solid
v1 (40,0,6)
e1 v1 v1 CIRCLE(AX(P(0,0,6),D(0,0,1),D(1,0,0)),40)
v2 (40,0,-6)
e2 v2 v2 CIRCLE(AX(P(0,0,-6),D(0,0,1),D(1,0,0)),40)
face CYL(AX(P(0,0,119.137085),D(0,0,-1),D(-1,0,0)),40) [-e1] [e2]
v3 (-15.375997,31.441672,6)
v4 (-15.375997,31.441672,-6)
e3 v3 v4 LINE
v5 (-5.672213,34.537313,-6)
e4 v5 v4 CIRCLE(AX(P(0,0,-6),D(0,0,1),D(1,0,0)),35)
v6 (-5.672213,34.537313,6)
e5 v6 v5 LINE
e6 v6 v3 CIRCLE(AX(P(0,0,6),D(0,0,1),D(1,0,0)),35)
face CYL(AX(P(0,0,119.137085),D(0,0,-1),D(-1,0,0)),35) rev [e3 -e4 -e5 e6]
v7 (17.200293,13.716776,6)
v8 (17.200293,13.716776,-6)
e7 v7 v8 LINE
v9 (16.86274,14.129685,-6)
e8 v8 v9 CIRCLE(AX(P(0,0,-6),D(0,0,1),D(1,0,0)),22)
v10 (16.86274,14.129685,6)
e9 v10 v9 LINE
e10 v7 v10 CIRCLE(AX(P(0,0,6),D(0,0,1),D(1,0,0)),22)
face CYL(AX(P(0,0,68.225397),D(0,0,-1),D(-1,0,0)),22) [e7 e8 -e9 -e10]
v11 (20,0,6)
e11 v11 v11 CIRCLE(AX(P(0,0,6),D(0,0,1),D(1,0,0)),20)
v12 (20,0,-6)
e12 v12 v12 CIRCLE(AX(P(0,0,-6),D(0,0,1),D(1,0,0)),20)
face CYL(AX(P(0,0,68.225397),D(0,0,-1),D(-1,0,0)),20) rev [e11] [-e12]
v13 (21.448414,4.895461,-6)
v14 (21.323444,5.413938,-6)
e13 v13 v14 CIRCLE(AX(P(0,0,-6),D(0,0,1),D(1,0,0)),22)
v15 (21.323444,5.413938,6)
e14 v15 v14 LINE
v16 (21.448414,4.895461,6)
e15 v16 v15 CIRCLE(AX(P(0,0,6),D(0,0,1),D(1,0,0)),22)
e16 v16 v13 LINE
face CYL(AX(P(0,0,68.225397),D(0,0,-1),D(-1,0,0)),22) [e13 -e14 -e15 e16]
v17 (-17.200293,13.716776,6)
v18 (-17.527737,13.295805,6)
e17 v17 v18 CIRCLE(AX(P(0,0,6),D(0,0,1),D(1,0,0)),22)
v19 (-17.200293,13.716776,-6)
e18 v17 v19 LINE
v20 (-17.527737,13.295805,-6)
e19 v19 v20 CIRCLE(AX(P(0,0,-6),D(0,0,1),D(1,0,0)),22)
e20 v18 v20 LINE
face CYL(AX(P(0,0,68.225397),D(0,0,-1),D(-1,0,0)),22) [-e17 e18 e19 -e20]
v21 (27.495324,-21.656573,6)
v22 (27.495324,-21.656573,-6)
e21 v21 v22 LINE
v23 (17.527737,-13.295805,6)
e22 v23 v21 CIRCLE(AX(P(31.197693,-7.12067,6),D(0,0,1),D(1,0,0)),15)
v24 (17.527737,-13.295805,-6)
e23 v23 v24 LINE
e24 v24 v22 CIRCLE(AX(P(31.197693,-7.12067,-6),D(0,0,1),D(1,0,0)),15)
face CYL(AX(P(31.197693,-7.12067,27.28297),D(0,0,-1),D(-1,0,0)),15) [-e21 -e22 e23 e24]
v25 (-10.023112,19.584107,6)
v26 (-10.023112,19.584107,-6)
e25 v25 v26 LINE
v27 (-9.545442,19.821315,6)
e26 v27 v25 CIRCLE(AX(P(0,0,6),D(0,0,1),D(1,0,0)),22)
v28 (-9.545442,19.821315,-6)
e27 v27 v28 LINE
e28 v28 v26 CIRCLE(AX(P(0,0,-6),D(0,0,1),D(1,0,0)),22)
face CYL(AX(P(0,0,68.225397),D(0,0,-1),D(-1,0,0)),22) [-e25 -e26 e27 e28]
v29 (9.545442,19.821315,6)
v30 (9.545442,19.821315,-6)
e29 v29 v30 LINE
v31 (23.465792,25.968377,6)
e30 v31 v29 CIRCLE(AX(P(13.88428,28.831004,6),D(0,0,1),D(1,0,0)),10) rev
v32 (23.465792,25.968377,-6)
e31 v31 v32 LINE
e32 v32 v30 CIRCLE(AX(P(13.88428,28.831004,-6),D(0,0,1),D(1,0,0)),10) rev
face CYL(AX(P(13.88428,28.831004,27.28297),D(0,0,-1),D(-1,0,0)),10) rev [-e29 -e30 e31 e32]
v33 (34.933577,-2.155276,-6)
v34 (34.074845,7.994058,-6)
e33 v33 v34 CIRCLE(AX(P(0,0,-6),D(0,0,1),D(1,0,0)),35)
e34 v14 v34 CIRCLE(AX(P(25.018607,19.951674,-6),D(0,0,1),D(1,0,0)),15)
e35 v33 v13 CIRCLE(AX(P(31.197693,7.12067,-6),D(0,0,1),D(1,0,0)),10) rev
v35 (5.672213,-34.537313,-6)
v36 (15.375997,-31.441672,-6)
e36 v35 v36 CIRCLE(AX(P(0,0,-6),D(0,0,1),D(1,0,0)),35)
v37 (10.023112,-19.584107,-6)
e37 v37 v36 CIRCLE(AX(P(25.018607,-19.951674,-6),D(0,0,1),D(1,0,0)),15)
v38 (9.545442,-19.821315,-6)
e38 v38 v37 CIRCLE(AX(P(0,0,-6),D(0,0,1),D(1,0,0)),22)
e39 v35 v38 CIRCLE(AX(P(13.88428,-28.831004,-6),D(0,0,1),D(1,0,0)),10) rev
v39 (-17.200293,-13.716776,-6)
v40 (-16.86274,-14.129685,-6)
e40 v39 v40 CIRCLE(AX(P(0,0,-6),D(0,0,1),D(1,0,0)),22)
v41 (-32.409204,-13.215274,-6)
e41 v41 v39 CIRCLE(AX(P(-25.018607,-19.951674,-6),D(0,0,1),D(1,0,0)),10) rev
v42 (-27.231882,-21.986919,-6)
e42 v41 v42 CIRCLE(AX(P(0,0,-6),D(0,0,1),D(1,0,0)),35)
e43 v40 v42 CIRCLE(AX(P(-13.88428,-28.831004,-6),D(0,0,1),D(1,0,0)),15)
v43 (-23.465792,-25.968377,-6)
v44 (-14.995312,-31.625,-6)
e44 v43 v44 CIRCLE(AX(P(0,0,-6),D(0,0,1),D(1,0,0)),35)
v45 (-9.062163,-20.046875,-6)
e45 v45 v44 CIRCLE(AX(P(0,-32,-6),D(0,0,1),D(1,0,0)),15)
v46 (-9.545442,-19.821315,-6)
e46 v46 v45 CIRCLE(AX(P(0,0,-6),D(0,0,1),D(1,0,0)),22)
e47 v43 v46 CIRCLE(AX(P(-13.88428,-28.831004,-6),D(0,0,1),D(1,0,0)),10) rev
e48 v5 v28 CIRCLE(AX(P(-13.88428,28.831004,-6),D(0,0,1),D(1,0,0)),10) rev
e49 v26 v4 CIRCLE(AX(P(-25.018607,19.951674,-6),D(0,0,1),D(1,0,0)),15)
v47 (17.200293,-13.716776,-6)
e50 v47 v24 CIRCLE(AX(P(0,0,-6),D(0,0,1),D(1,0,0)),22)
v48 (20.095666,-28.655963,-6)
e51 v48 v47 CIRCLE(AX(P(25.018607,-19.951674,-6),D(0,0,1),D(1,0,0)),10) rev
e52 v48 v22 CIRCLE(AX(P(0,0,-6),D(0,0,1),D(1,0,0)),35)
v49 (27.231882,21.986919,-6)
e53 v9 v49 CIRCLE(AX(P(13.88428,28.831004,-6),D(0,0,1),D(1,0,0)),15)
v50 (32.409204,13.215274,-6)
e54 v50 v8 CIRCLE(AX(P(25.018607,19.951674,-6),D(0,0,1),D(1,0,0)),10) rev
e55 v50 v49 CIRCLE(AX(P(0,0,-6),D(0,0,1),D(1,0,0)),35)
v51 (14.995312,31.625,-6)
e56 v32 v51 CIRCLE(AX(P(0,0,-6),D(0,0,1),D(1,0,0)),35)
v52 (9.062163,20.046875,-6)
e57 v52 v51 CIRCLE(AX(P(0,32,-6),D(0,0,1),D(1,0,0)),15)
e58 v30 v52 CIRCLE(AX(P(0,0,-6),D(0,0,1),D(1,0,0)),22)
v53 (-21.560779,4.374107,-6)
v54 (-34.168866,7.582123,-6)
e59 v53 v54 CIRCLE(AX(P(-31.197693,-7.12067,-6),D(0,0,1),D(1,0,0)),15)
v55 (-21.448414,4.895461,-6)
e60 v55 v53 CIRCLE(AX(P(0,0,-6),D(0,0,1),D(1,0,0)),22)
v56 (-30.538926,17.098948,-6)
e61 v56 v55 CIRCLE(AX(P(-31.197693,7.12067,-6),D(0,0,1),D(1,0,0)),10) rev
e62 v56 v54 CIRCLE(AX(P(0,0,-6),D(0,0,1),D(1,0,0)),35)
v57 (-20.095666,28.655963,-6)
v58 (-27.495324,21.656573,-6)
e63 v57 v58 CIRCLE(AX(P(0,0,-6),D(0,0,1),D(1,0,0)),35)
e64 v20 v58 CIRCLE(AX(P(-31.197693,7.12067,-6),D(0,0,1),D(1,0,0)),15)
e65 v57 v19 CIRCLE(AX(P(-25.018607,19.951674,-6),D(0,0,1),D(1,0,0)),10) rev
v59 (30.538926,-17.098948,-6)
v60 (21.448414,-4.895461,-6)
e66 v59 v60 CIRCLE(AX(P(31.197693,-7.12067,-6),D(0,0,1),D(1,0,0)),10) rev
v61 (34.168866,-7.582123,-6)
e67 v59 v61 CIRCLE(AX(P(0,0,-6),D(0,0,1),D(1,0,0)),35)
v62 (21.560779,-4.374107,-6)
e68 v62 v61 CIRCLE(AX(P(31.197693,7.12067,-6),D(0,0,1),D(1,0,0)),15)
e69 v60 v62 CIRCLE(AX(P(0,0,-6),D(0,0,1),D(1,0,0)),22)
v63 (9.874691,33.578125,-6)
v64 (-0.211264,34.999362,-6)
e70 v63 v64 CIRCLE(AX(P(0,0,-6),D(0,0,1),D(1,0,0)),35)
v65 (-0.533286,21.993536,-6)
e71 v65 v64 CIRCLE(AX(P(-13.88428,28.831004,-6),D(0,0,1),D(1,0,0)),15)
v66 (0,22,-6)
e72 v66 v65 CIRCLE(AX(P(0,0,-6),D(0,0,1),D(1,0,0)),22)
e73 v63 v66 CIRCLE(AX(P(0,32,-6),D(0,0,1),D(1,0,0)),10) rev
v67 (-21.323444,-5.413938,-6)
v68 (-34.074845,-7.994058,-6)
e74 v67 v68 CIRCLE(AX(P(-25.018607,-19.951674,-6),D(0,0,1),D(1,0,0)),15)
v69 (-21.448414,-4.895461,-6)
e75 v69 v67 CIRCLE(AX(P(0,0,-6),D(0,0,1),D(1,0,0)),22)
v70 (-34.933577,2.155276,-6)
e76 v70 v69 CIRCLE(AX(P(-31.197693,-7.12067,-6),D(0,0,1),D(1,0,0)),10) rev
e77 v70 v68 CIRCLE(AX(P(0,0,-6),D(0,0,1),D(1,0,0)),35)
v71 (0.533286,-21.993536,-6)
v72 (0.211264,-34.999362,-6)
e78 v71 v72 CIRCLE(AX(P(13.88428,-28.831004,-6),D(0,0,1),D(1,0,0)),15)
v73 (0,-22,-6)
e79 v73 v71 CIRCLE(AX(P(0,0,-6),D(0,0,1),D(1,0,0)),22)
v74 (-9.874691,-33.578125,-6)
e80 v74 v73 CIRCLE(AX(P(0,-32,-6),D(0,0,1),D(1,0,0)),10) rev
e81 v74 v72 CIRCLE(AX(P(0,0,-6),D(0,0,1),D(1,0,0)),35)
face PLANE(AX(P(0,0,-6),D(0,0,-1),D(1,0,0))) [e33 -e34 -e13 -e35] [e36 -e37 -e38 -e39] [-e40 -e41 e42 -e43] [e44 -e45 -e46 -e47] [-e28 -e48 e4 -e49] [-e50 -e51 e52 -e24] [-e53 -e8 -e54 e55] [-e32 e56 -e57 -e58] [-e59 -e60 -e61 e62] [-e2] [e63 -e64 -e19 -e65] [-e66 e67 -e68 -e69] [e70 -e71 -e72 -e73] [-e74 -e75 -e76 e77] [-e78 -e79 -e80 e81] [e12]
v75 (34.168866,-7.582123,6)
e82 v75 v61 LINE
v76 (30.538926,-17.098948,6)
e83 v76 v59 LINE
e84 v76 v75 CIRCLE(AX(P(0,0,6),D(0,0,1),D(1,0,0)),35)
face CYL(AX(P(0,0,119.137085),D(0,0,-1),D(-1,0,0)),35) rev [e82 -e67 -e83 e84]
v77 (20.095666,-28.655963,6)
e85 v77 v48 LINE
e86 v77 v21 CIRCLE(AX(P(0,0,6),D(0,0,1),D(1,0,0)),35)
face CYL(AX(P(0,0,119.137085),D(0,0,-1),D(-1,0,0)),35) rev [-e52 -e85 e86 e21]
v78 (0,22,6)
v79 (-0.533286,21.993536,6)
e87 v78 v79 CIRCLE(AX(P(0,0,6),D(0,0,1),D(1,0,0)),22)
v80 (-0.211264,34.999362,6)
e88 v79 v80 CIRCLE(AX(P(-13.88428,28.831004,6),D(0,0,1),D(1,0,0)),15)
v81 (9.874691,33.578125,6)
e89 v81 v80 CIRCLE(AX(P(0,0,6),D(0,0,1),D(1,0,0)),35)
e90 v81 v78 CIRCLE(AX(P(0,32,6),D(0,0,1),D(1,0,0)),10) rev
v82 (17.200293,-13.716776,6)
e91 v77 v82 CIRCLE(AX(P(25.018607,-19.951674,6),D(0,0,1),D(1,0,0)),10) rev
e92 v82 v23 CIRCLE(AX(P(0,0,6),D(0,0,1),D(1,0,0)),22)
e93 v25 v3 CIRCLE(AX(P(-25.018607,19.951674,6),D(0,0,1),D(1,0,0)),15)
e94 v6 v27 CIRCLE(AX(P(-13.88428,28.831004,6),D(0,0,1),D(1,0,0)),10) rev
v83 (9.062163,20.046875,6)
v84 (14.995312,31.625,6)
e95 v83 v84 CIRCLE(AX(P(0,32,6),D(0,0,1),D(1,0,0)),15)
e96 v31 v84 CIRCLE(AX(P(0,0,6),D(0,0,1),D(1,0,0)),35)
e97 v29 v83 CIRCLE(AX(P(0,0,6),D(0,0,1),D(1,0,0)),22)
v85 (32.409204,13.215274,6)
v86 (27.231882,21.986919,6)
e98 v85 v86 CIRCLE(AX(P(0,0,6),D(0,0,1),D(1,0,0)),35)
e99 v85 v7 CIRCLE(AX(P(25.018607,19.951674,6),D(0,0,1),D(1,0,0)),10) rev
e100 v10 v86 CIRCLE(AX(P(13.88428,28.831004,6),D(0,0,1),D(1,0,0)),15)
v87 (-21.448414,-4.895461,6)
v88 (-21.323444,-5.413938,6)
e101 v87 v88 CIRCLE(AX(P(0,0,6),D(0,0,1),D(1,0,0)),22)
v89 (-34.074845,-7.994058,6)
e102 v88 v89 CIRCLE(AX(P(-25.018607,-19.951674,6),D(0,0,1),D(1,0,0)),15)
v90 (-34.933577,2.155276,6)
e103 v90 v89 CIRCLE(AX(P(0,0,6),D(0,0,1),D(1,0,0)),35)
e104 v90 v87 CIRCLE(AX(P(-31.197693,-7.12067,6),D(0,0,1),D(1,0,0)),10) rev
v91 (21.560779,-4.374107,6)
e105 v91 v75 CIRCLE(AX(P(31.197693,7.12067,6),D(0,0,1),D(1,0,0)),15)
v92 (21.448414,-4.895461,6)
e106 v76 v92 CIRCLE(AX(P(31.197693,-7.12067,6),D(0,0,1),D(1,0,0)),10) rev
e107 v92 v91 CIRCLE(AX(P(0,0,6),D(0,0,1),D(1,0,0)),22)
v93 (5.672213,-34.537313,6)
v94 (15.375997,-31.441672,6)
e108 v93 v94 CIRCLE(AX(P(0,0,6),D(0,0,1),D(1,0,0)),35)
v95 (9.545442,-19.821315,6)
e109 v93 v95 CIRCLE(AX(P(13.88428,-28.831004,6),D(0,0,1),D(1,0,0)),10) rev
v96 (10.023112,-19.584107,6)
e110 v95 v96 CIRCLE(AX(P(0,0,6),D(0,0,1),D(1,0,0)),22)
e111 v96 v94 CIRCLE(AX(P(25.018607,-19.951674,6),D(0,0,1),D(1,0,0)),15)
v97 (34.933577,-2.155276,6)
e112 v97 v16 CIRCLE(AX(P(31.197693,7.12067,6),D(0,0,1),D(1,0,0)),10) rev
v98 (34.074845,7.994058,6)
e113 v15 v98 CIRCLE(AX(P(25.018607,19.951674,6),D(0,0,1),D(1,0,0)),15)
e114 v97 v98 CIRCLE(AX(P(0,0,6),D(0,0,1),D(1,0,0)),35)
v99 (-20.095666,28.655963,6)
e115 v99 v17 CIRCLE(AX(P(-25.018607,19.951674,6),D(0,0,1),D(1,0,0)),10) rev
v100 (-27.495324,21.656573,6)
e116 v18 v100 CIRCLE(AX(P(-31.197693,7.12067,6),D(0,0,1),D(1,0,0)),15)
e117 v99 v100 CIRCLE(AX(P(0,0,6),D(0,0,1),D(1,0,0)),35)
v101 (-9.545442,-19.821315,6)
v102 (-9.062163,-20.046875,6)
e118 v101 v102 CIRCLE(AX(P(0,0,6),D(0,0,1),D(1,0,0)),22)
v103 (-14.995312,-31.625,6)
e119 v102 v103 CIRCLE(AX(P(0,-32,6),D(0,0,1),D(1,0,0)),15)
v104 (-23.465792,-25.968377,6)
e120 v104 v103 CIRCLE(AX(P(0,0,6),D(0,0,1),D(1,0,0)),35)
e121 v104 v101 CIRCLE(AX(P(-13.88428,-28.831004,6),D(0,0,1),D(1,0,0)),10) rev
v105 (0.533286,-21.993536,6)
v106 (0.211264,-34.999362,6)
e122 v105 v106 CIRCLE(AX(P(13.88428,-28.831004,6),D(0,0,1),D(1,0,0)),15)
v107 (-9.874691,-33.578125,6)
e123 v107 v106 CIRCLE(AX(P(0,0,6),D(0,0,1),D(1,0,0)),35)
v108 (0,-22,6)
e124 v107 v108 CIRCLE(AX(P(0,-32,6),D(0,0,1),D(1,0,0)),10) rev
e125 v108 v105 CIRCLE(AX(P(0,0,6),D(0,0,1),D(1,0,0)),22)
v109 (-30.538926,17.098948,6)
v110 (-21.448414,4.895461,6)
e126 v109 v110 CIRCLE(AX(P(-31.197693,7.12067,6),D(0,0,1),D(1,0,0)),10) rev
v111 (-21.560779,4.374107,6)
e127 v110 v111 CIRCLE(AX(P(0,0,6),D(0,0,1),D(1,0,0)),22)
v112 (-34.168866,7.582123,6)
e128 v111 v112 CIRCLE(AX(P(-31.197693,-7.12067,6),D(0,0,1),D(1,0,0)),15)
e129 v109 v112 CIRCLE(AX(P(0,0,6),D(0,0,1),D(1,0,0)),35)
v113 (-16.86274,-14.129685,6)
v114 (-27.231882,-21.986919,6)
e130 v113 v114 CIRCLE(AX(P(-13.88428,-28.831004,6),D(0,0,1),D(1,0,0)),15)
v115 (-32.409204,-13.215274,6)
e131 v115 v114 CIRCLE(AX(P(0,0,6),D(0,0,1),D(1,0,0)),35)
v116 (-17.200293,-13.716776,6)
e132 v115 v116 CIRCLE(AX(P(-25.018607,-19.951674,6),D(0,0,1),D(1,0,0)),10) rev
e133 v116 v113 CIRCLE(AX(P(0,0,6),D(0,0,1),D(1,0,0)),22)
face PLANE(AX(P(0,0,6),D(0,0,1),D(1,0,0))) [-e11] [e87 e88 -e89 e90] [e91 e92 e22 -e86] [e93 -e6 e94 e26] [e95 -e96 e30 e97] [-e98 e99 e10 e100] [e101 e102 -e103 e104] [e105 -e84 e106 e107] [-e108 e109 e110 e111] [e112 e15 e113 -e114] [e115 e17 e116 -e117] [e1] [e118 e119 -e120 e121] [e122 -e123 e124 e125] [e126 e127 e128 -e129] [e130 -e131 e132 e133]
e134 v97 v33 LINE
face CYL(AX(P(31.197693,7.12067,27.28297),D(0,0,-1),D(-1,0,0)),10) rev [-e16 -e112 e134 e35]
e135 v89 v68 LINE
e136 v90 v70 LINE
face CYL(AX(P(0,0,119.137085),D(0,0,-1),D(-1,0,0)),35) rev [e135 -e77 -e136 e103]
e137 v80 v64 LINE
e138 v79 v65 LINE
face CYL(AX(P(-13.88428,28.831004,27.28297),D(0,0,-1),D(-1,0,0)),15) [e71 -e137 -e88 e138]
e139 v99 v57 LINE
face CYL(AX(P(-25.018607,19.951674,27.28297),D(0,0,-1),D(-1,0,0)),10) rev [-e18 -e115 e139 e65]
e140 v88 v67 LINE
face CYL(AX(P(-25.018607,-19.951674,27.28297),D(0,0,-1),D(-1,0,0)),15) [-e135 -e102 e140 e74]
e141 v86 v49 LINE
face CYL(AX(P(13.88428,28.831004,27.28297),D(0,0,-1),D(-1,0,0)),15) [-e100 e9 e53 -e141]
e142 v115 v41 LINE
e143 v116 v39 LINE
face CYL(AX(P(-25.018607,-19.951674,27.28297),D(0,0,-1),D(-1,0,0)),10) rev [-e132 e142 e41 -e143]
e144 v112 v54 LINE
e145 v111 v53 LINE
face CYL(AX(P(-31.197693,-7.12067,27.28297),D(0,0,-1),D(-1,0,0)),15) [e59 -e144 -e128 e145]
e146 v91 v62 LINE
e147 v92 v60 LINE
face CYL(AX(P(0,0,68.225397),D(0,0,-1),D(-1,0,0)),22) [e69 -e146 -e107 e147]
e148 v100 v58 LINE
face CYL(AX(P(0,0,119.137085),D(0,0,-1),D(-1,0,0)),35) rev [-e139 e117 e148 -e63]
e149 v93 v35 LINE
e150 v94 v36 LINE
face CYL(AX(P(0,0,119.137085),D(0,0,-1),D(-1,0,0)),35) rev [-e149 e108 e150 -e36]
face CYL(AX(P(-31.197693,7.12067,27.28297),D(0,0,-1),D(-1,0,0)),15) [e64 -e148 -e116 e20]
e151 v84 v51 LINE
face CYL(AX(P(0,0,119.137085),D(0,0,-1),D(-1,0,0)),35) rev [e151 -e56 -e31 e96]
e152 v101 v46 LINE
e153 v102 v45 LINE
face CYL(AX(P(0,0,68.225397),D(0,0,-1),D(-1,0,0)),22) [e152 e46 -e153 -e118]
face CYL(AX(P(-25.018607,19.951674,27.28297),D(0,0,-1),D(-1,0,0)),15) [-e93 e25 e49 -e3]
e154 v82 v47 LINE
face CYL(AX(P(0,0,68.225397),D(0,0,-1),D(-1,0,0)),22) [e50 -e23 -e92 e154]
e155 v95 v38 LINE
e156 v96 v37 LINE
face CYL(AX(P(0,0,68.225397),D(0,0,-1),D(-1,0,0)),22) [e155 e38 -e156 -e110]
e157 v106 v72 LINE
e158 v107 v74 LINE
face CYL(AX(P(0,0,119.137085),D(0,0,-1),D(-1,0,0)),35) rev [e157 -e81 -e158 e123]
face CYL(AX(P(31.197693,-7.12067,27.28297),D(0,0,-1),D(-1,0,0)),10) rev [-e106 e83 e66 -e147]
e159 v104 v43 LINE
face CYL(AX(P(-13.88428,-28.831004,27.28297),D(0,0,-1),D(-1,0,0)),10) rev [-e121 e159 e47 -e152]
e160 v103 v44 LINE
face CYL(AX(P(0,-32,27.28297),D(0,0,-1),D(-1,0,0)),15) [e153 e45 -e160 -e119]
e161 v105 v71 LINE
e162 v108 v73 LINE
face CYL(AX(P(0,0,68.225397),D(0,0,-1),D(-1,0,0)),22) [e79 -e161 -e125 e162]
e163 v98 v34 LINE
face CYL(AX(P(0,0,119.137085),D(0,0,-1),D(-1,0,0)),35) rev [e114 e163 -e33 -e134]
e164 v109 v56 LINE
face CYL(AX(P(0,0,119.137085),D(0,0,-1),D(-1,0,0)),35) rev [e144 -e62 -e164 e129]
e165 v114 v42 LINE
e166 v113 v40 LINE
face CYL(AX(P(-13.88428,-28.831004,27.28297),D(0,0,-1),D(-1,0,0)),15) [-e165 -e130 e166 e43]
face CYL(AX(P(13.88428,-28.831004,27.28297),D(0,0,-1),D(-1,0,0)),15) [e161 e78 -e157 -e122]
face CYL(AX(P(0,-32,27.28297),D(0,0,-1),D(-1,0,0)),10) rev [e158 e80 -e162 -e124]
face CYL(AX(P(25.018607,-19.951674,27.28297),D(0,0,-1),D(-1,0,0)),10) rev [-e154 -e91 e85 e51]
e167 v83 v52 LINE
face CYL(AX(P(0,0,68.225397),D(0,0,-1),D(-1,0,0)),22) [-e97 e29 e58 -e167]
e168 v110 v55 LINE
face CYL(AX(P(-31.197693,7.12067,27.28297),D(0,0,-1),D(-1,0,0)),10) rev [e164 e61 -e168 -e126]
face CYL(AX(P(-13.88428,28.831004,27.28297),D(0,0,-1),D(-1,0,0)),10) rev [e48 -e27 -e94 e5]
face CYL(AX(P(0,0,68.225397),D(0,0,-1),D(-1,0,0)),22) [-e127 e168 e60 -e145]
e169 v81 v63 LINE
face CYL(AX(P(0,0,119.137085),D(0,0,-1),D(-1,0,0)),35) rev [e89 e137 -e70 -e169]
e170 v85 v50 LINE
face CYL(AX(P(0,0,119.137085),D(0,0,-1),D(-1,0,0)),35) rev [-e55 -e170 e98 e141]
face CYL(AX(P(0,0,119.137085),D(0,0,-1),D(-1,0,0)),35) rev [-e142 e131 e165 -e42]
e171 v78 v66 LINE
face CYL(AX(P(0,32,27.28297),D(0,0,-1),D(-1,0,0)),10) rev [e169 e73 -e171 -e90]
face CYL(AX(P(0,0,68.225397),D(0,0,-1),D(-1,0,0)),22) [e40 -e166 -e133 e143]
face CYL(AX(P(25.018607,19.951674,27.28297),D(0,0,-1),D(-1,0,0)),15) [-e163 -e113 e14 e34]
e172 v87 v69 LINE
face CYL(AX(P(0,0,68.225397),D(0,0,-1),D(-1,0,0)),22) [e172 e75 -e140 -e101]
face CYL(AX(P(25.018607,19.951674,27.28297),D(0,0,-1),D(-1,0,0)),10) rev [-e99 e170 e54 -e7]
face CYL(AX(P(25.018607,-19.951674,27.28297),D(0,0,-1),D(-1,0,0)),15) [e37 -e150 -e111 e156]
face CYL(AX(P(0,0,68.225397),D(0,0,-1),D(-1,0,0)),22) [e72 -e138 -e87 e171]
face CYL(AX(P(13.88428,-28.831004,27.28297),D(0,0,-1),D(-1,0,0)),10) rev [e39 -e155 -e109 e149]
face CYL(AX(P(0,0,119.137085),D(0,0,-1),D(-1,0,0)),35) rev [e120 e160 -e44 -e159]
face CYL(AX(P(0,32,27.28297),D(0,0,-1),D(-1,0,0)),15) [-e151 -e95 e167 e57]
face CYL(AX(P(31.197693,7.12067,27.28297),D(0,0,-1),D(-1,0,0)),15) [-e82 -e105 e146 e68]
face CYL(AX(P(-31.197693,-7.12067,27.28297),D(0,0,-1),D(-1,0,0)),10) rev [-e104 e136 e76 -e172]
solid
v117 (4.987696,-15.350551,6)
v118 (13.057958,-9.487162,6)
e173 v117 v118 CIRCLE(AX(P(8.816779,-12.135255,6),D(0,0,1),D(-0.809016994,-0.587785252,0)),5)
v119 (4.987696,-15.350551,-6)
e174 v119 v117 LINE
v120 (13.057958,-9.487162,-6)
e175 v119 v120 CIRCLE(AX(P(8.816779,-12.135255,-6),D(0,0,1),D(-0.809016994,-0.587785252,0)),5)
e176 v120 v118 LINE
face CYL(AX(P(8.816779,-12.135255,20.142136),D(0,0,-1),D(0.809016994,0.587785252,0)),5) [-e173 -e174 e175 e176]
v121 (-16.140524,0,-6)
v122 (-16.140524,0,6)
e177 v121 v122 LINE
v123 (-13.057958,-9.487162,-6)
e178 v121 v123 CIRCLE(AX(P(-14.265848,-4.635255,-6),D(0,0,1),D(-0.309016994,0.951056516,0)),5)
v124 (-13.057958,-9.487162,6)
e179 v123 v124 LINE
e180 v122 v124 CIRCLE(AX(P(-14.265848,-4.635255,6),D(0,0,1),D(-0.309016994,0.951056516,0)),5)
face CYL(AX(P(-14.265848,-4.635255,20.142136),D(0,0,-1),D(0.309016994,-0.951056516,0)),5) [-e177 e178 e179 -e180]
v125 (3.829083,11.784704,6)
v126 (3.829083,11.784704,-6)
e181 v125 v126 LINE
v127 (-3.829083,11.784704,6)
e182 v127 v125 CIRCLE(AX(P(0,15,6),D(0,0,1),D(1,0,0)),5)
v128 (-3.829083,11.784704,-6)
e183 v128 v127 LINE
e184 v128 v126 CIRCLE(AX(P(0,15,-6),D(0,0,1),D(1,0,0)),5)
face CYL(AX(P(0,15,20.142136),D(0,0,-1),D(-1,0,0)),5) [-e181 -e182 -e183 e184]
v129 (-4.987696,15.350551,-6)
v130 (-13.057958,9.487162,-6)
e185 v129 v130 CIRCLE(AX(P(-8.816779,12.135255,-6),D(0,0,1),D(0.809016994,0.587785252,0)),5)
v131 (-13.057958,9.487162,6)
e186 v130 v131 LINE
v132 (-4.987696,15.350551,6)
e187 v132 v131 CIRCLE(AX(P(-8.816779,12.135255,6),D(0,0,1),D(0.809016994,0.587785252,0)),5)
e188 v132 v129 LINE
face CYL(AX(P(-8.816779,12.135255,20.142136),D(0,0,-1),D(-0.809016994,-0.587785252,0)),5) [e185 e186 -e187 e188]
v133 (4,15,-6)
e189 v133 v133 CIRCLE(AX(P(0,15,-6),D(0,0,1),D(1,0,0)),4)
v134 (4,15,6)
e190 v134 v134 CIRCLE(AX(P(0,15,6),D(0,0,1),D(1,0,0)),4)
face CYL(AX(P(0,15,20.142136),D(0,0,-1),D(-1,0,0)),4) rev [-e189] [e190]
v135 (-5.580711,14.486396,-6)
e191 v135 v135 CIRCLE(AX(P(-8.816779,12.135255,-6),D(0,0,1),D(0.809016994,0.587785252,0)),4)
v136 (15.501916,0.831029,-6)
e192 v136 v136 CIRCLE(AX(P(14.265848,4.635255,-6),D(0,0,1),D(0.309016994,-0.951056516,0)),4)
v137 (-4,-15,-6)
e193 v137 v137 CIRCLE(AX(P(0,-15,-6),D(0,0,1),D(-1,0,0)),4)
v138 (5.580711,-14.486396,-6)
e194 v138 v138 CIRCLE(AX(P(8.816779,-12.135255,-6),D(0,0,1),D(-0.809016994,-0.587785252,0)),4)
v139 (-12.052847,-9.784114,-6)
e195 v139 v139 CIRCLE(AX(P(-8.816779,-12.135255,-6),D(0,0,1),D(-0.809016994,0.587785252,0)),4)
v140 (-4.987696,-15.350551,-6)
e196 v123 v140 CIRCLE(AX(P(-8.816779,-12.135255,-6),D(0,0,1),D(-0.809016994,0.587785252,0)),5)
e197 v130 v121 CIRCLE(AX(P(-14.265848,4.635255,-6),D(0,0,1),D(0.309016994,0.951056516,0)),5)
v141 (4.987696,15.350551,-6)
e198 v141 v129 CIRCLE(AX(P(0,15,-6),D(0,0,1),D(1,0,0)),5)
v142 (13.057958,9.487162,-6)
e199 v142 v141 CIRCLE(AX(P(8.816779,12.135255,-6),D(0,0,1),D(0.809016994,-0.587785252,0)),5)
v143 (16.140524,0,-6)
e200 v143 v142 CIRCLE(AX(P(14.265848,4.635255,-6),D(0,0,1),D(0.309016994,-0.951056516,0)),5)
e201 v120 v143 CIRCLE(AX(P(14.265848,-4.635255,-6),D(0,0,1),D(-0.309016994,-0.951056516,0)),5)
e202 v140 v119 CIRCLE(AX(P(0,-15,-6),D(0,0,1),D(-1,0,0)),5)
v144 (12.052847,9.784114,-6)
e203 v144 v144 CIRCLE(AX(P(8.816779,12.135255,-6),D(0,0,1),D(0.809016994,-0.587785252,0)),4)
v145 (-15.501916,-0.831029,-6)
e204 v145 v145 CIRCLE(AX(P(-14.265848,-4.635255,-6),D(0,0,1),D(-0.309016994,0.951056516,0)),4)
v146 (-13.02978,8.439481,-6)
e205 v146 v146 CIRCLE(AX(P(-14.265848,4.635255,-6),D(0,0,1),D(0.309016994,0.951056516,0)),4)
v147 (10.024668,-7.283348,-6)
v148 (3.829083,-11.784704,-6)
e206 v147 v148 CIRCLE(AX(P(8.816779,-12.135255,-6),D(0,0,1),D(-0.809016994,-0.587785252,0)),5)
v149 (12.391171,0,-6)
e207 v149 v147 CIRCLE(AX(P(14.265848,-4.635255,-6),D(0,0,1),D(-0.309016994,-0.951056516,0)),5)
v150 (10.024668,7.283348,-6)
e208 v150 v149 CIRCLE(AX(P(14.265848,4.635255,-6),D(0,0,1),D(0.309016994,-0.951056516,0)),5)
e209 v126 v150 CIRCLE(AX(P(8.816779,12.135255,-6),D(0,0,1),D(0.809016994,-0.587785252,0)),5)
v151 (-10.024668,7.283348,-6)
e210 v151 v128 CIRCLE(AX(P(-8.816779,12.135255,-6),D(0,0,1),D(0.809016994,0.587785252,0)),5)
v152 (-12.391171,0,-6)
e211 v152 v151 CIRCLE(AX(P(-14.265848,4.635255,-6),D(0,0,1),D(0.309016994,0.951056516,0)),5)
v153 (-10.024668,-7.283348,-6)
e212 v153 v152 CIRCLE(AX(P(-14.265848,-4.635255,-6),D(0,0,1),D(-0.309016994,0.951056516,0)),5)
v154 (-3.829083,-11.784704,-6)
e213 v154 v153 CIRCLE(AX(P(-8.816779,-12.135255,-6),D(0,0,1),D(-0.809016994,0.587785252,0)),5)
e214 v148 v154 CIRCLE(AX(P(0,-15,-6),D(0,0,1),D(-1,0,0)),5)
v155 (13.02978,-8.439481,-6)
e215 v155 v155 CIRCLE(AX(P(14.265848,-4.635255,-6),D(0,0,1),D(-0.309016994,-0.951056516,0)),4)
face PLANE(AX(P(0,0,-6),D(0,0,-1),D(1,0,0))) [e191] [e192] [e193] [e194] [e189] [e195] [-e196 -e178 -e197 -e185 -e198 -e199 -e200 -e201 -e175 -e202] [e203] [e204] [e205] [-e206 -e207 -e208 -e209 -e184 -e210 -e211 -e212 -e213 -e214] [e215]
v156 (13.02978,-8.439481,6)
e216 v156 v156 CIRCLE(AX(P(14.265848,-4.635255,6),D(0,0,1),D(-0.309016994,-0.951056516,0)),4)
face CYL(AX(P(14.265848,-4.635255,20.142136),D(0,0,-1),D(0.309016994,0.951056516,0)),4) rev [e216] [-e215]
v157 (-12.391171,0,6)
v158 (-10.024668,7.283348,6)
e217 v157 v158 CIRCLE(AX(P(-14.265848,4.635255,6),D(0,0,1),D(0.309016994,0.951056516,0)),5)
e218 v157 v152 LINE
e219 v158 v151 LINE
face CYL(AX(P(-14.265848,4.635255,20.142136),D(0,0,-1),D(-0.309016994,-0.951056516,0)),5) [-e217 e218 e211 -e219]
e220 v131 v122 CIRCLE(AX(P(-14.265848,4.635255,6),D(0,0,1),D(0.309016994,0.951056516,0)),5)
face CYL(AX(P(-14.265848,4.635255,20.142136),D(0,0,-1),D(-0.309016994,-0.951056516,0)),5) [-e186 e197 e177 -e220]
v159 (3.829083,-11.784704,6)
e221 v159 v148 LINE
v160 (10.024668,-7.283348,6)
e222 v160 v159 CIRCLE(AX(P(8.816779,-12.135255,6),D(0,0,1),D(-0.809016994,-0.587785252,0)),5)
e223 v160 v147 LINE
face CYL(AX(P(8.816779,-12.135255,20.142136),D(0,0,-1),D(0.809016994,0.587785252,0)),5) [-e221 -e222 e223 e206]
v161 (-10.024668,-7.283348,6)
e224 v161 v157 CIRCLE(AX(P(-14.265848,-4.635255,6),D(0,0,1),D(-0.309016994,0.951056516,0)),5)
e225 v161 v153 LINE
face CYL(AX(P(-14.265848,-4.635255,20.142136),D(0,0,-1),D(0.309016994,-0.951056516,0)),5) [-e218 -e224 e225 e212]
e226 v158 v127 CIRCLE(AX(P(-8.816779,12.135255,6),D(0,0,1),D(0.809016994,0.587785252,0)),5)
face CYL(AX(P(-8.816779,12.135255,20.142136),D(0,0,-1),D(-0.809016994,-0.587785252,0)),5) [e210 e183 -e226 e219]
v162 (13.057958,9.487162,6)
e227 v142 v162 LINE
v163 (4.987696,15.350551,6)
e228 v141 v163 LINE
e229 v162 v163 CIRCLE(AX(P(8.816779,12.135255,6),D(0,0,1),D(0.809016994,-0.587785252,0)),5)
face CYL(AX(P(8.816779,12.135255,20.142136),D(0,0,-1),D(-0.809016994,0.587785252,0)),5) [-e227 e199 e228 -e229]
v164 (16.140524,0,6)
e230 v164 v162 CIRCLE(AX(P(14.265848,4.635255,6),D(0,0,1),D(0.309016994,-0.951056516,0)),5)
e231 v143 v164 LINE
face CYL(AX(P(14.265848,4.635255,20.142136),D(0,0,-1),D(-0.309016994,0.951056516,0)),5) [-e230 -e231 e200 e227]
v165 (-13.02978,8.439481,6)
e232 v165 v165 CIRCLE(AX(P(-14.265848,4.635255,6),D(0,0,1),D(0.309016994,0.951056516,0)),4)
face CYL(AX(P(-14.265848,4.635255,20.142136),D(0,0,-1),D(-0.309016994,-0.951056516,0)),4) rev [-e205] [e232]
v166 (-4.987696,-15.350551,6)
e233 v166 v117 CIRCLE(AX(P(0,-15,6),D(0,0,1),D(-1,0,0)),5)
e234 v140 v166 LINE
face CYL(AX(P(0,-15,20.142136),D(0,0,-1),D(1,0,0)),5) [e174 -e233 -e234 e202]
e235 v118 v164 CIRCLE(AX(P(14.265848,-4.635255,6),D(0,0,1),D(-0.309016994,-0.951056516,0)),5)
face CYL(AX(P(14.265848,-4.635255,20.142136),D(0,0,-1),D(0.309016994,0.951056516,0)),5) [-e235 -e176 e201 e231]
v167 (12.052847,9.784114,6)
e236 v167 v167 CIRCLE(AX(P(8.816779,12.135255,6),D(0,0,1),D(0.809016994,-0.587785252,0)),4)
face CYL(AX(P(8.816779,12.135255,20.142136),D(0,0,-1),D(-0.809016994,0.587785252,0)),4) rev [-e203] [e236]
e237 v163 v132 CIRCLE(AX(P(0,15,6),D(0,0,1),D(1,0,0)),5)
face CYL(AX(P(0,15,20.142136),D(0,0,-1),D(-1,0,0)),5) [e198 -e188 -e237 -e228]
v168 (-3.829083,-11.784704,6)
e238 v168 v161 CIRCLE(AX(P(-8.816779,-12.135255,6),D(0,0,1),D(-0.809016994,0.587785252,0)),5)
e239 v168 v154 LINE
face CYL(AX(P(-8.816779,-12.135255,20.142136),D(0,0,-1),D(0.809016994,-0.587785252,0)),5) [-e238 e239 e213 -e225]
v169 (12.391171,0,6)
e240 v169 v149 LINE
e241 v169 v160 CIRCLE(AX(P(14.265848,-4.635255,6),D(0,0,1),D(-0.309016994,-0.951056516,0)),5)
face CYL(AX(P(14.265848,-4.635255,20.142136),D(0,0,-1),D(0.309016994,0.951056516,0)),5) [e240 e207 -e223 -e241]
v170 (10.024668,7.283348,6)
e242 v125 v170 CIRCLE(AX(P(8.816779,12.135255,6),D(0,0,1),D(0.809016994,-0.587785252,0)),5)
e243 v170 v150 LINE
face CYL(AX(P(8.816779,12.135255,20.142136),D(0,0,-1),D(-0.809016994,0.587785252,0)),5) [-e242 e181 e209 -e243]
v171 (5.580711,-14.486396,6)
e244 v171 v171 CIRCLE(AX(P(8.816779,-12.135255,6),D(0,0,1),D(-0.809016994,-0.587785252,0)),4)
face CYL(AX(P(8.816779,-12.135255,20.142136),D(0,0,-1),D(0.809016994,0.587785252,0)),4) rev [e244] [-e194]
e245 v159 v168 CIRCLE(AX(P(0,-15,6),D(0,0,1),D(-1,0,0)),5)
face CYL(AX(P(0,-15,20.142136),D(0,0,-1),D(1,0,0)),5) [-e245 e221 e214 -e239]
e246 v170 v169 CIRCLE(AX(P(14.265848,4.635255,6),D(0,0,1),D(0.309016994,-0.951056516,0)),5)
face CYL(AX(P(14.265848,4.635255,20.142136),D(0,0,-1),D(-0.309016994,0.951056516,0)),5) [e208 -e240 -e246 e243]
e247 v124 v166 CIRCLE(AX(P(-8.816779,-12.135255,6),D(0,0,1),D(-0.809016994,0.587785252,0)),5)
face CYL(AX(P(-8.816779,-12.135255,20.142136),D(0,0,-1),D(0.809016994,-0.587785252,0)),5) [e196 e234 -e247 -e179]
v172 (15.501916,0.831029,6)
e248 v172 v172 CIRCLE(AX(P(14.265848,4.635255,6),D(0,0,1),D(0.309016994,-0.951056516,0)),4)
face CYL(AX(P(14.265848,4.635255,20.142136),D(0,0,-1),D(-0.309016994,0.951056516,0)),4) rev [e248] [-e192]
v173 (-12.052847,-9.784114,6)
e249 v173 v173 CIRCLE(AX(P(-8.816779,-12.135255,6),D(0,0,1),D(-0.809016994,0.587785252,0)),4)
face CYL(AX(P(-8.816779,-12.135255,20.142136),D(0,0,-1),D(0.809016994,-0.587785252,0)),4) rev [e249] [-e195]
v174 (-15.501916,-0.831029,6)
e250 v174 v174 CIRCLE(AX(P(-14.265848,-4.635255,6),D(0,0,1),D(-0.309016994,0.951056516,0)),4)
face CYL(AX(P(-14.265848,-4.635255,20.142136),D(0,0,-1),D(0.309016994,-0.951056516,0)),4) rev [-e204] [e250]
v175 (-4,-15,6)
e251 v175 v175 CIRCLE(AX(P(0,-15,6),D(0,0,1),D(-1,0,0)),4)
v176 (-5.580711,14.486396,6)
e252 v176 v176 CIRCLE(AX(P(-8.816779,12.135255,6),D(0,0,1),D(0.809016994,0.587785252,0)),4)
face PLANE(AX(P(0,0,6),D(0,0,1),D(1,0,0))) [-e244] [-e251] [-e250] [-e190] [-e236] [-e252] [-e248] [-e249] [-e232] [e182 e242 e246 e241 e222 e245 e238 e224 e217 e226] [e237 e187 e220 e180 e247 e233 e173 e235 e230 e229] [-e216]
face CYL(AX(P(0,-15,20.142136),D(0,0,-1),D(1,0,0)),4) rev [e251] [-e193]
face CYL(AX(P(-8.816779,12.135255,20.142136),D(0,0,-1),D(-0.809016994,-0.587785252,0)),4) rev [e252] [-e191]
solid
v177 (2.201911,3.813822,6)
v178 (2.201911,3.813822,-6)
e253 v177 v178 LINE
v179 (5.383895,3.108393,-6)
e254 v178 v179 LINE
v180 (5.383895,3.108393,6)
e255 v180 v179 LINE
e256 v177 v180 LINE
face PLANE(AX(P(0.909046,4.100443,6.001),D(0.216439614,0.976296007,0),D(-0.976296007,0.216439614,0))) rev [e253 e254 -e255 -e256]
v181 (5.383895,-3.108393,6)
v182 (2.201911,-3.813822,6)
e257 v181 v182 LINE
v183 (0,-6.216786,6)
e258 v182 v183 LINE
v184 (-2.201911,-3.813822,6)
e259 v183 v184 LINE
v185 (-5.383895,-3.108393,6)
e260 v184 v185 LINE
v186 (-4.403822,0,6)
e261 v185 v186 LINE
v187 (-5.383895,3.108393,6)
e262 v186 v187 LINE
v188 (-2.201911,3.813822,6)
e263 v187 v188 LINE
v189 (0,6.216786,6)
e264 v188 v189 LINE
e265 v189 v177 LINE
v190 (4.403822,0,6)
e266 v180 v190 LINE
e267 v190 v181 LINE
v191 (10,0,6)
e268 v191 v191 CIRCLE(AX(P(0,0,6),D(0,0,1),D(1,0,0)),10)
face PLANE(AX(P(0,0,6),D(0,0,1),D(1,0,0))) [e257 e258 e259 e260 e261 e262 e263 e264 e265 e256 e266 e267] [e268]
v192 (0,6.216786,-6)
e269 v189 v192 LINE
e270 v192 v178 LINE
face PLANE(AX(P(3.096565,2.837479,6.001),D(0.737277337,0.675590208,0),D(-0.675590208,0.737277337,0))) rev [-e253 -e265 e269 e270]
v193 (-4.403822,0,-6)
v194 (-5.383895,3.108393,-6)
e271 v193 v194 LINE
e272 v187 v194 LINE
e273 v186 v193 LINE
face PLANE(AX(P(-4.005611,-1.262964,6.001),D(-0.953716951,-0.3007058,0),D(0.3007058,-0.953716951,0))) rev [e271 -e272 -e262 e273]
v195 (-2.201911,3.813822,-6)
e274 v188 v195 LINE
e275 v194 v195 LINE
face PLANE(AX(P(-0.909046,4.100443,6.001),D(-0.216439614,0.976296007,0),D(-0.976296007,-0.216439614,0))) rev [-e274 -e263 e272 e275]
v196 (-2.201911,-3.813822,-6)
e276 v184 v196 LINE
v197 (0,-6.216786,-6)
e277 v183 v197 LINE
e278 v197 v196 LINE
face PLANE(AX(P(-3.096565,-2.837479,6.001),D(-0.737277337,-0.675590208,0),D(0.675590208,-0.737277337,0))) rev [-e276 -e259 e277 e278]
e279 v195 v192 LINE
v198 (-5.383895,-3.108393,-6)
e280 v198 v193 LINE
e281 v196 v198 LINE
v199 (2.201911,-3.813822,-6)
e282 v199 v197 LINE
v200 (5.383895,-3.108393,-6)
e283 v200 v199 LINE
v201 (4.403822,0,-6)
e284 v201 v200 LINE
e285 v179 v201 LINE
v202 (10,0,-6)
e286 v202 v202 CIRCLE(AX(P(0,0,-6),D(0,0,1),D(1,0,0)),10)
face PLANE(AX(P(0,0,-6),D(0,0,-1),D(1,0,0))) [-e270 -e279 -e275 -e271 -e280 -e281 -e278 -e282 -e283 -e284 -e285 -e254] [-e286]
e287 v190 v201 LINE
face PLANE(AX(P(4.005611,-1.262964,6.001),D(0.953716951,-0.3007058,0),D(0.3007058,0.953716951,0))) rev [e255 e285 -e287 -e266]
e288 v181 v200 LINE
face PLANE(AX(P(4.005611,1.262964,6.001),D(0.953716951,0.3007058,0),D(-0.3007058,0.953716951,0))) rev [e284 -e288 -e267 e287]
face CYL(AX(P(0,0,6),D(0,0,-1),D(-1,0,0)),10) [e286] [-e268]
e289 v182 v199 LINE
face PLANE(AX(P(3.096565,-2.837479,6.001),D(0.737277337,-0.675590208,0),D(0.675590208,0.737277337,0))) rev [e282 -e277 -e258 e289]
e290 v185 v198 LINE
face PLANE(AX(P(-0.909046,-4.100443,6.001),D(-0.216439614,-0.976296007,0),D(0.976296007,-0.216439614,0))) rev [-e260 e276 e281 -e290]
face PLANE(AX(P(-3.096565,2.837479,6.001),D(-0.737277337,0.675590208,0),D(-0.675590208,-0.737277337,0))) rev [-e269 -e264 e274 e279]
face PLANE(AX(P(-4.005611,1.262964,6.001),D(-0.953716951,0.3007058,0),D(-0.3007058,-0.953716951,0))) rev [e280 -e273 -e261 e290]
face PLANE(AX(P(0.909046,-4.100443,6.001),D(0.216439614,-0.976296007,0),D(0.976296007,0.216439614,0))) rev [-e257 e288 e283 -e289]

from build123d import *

# Parameters (mm, degrees)
SKETCH2_R           = 10
SKETCH2_R_2         = 1
BOSS_EXTRUDE2_DEPTH = 6
SKETCH3_R           = 5
SKETCH3_R_2         = 4
BOSS_EXTRUDE3_DEPTH = 6
CIRPATTERN1_COUNT   = 10
SKETCH5_R           = 22
SKETCH5_R_2         = 20
BOSS_EXTRUDE4_DEPTH = 6
SKETCH6_R           = 40
SKETCH6_R_2         = 35
BOSS_EXTRUDE5_DEPTH = 6
BOSS_EXTRUDE6_DEPTH = 6
CAVITY1_OUTLINE_R   = 1
CAVITY1_DEPTH       = 6
CUT_EXTRUDE1_DEPTH  = 6


# Read off the part's stored shape, not the designer's step: Cavity1
with BuildPart() as part:
    # Sketch2 → Boss-Extrude2 (new body)
    with BuildSketch(Plane.XY):
        Circle(SKETCH2_R)
        Circle(SKETCH2_R_2, mode=Mode.SUBTRACT)
    extrude(amount=BOSS_EXTRUDE2_DEPTH)

    # Cavity1 outline → Cavity1 (cut)
    with BuildSketch(Plane.XY):
        Polygon((5.127518984, -2.960374466), (4.194116501, 0), (5.127518984, 2.960374466), (2.09705825, 3.632211436), (0, 5.920748932), (-2.09705825, 3.632211436), (-5.127518984, 2.960374466), (-4.194116501, 0), (-5.127518984, -2.960374466), (-2.09705825, -3.632211436), (0, -5.920748932), (2.09705825, -3.632211436), align=None)
        Circle(CAVITY1_OUTLINE_R, mode=Mode.SUBTRACT)
    extrude(amount=CAVITY1_DEPTH, mode=Mode.SUBTRACT)

    # Sketch8 → Cut-Extrude1 (cut)
    # profile 1 of 2: a face of its own
    with BuildSketch(Plane(origin=(0, 0, 0), x_dir=(-1, 0, 0), z_dir=(0, 0, -1))):
        Polygon((5.383894933, -3.108393189), (4.403822326, 0), (5.383894933, 3.108393189), (2.201911163, 3.813822008), (0, 6.216786378), (-2.201911163, 3.813822008), (-5.383894933, 3.108393189), (-4.403822326, 0), (-5.383894933, -3.108393189), (-2.201911163, -3.813822008), (0, -6.216786378), (2.201911163, -3.813822008), align=None)
        Polygon((-2.09705825, -3.632211436), (-5.127518984, -2.960374466), (-4.194116501, 0), (-5.127518984, 2.960374466), (-2.09705825, 3.632211436), (0, 5.920748932), (2.09705825, 3.632211436), (5.127518984, 2.960374466), (4.194116501, 0), (5.127518984, -2.960374466), (2.09705825, -3.632211436), (0, -5.920748932), align=None, mode=Mode.SUBTRACT)
    # profile 2 of 2: a face of its own
    with BuildSketch(Plane(origin=(0, 0, 0), x_dir=(-1, 0, 0), z_dir=(0, 0, -1))):
        Polygon((-5.127518984, -2.960374466), (-4.194116501, 0), (-5.127518984, 2.960374466), (-2.09705825, 3.632211436), (0, 5.920748932), (2.09705825, 3.632211436), (5.127518984, 2.960374466), (4.194116501, 0), (5.127518984, -2.960374466), (2.09705825, -3.632211436), (0, -5.920748932), (-2.09705825, -3.632211436), align=None)
    extrude(amount=-CUT_EXTRUDE1_DEPTH, mode=Mode.SUBTRACT)

    # Mirror1: part across plane


with BuildPart() as body_2:
    # Sketch3 → Boss-Extrude3 (new body)
    with BuildSketch(Plane.XY):
        with Locations((0, 15)):
            Circle(SKETCH3_R)
        with Locations((0, 15)):
            Circle(SKETCH3_R_2, mode=Mode.SUBTRACT)
    boss_extrude3 = extrude(amount=BOSS_EXTRUDE3_DEPTH)

    # CirPattern1: Boss-Extrude3 ×10 about axis
    cirpattern1_axis = Axis((0, 0, 0), (0, 0, 1))
    for i in range(1, CIRPATTERN1_COUNT):
        add(boss_extrude3.rotate(cirpattern1_axis, i * 360 / CIRPATTERN1_COUNT))

    # Mirror1 2: body 2 across plane


with BuildPart() as body_3:
    # Sketch5 → Boss-Extrude4 (new body)
    with BuildSketch(Plane.XY):
        Circle(SKETCH5_R)
        Circle(SKETCH5_R_2, mode=Mode.SUBTRACT)
    extrude(amount=BOSS_EXTRUDE4_DEPTH)



with BuildPart() as body_4:
    # Sketch6 → Boss-Extrude5 (new body)
    with BuildSketch(Plane.XY):
        Circle(SKETCH6_R)
        Circle(SKETCH6_R_2, mode=Mode.SUBTRACT)
    extrude(amount=BOSS_EXTRUDE5_DEPTH)


with BuildPart() as body_3_1:
    add(body_3.part)

    add(body_4.part)  # Boss-Extrude6 merges body 4
    # Sketch7 → Boss-Extrude6 (add)
    with BuildSketch(Plane.XY):
        with BuildLine():
            ThreePointArc((0, 22), (7.608588897, 25.510826324), (9.874690956, 33.578125))
            ThreePointArc((9.874690956, 33.578125), (12.473288788, 32.70194286), (14.995311767, 31.625))
            ThreePointArc((14.995311767, 31.625), (13.349298508, 25.159223045), (9.062163248, 20.046875))
            ThreePointArc((9.062163248, 20.046875), (4.635124054, 21.506176438), (0, 22))
        make_face()
        with BuildLine():
            ThreePointArc((16.862740045, 14.129684999), (13.507282719, 17.365290483), (9.545442261, 19.821315094))
            ThreePointArc((9.545442261, 19.821315094), (17.923834438, 19.683217312), (23.465791559, 25.968377433))
            ThreePointArc((23.465791559, 25.968377433), (25.426886123, 24.051475258), (27.231882316, 21.986918509))
            ThreePointArc((27.231882316, 21.986918509), (22.943480132, 16.875633153), (16.862740045, 14.129684999))
        make_face()
        with BuildLine():
            ThreePointArc((21.323444368, 5.413937595), (19.704158385, 9.784995775), (17.200292614, 13.716775641))
            ThreePointArc((17.200292614, 13.716775641), (24.689044747, 9.957105713), (32.409204355, 13.215274234))
            ThreePointArc((32.409204355, 13.215274234), (33.344376821, 10.63731801), (34.074844596, 7.994058155))
            ThreePointArc((34.074844596, 7.994058155), (27.993424133, 5.249617149), (21.323444368, 5.413937595))
        make_face()
        with BuildLine():
            ThreePointArc((21.560779019, -4.374106547), (21.998383828, 0.26666265), (21.448414068, 4.895460547))
            ThreePointArc((21.448414068, 4.895460547), (26.564286953, -1.741132788), (34.933576755, -2.155276102))
            ThreePointArc((34.933576755, -2.155276102), (34.657604747, -4.883690529), (34.168866002, -7.582123457))
            ThreePointArc((34.168866002, -7.582123457), (27.498927167, -7.416149914), (21.560779019, -4.374106547))
        make_face()
        with BuildLine():
            ThreePointArc((17.52773696, -13.295805243), (19.935559561, -9.304486284), (21.448414068, -4.895460547))
            ThreePointArc((21.448414068, -4.895460547), (23.178146338, -13.094518587), (30.538925847, -17.098947573))
            ThreePointArc((30.538925847, -17.098947573), (29.106469006, -19.437424263), (27.495324443, -21.65657253))
            ThreePointArc((27.495324443, -21.65657253), (21.557930424, -18.613057533), (17.52773696, -13.295805243))
        make_face()
        with BuildLine():
            ThreePointArc((10.023111632, -19.584106648), (13.924253229, -17.032767597), (17.200292614, -13.716775641))
            ThreePointArc((17.200292614, -13.716775641), (15.20128958, -21.854374387), (20.095666139, -28.655962772))
            ThreePointArc((20.095666139, -28.655962772), (17.790440111, -30.141337738), (15.37599667, -31.441671813))
            ThreePointArc((15.37599667, -31.441671813), (11.34712117, -26.123420834), (10.023111632, -19.584106648))
        make_face()
        with BuildLine():
            ThreePointArc((0.53328612, -21.993535548), (5.155077775, -21.387500395), (9.545442261, -19.821315094))
            ThreePointArc((9.545442261, -19.821315094), (4.213630989, -26.285703312), (5.672213296, -34.537313102))
            ThreePointArc((5.672213296, -34.537313102), (2.950796366, -34.875389615), (0.211264183, -34.999362386))
            ThreePointArc((0.211264183, -34.999362386), (-1.111124596, -28.459720256), (0.53328612, -21.993535548))
        make_face()
        with BuildLine():
            ThreePointArc((-9.062163248, -20.046875), (-4.635124054, -21.506176438), (0, -22))
            ThreePointArc((0, -22), (-7.608588897, -25.510826324), (-9.874690956, -33.578125))
            ThreePointArc((-9.874690956, -33.578125), (-12.473288788, -32.70194286), (-14.995311767, -31.625))
            ThreePointArc((-14.995311767, -31.625), (-13.349298508, -25.159223045), (-9.062163248, -20.046875))
        make_face()
        with BuildLine():
            ThreePointArc((-16.862740045, -14.129684999), (-13.507282719, -17.365290483), (-9.545442261, -19.821315094))
            ThreePointArc((-9.545442261, -19.821315094), (-17.923834438, -19.683217312), (-23.465791559, -25.968377433))
            ThreePointArc((-23.465791559, -25.968377433), (-25.426886123, -24.051475258), (-27.231882316, -21.986918509))
            ThreePointArc((-27.231882316, -21.986918509), (-22.943480132, -16.875633153), (-16.862740045, -14.129684999))
        make_face()
        with BuildLine():
            ThreePointArc((-21.323444368, -5.413937595), (-19.704158385, -9.784995775), (-17.200292614, -13.716775641))
            ThreePointArc((-17.200292614, -13.716775641), (-24.689044747, -9.957105713), (-32.409204355, -13.215274234))
            ThreePointArc((-32.409204355, -13.215274234), (-33.344376821, -10.63731801), (-34.074844596, -7.994058155))
            ThreePointArc((-34.074844596, -7.994058155), (-27.993424133, -5.249617149), (-21.323444368, -5.413937595))
        make_face()
        with BuildLine():
            ThreePointArc((-21.560779019, 4.374106547), (-21.998383828, -0.26666265), (-21.448414068, -4.895460547))
            ThreePointArc((-21.448414068, -4.895460547), (-26.564286953, 1.741132788), (-34.933576755, 2.155276102))
            ThreePointArc((-34.933576755, 2.155276102), (-34.657604747, 4.883690529), (-34.168866002, 7.582123457))
            ThreePointArc((-34.168866002, 7.582123457), (-27.498927167, 7.416149914), (-21.560779019, 4.374106547))
        make_face()
        with BuildLine():
            ThreePointArc((-17.52773696, 13.295805243), (-19.935559561, 9.304486284), (-21.448414068, 4.895460547))
            ThreePointArc((-21.448414068, 4.895460547), (-23.178146338, 13.094518587), (-30.538925847, 17.098947573))
            ThreePointArc((-30.538925847, 17.098947573), (-29.106469006, 19.437424263), (-27.495324443, 21.65657253))
            ThreePointArc((-27.495324443, 21.65657253), (-21.557930424, 18.613057533), (-17.52773696, 13.295805243))
        make_face()
        with BuildLine():
            ThreePointArc((-10.023111632, 19.584106648), (-13.924253229, 17.032767597), (-17.200292614, 13.716775641))
            ThreePointArc((-17.200292614, 13.716775641), (-15.20128958, 21.854374387), (-20.095666139, 28.655962772))
            ThreePointArc((-20.095666139, 28.655962772), (-17.790440111, 30.141337738), (-15.37599667, 31.441671813))
            ThreePointArc((-15.37599667, 31.441671813), (-11.34712117, 26.123420834), (-10.023111632, 19.584106648))
        make_face()
        with BuildLine():
            ThreePointArc((-0.53328612, 21.993535548), (-5.155077775, 21.387500395), (-9.545442261, 19.821315094))
            ThreePointArc((-9.545442261, 19.821315094), (-4.213630989, 26.285703312), (-5.672213296, 34.537313102))
            ThreePointArc((-5.672213296, 34.537313102), (-2.950796366, 34.875389615), (-0.211264183, 34.999362386))
            ThreePointArc((-0.211264183, 34.999362386), (1.111124596, 28.459720256), (-0.53328612, 21.993535548))
        make_face()
    extrude(amount=BOSS_EXTRUDE6_DEPTH)

    # Mirror1 3: body 3 across plane


with BuildPart() as part_1:
    add(part.part)
    add(part.part.mirror(Plane.XY))


with BuildPart() as body_2_1:
    add(body_2.part)
    add(body_2.part.mirror(Plane.XY))


with BuildPart() as body_3_2:
    add(body_3_1.part)
    add(body_3_1.part.mirror(Plane.XY))


solid = Compound([part_1.part, body_2_1.part, body_3_2.part])
